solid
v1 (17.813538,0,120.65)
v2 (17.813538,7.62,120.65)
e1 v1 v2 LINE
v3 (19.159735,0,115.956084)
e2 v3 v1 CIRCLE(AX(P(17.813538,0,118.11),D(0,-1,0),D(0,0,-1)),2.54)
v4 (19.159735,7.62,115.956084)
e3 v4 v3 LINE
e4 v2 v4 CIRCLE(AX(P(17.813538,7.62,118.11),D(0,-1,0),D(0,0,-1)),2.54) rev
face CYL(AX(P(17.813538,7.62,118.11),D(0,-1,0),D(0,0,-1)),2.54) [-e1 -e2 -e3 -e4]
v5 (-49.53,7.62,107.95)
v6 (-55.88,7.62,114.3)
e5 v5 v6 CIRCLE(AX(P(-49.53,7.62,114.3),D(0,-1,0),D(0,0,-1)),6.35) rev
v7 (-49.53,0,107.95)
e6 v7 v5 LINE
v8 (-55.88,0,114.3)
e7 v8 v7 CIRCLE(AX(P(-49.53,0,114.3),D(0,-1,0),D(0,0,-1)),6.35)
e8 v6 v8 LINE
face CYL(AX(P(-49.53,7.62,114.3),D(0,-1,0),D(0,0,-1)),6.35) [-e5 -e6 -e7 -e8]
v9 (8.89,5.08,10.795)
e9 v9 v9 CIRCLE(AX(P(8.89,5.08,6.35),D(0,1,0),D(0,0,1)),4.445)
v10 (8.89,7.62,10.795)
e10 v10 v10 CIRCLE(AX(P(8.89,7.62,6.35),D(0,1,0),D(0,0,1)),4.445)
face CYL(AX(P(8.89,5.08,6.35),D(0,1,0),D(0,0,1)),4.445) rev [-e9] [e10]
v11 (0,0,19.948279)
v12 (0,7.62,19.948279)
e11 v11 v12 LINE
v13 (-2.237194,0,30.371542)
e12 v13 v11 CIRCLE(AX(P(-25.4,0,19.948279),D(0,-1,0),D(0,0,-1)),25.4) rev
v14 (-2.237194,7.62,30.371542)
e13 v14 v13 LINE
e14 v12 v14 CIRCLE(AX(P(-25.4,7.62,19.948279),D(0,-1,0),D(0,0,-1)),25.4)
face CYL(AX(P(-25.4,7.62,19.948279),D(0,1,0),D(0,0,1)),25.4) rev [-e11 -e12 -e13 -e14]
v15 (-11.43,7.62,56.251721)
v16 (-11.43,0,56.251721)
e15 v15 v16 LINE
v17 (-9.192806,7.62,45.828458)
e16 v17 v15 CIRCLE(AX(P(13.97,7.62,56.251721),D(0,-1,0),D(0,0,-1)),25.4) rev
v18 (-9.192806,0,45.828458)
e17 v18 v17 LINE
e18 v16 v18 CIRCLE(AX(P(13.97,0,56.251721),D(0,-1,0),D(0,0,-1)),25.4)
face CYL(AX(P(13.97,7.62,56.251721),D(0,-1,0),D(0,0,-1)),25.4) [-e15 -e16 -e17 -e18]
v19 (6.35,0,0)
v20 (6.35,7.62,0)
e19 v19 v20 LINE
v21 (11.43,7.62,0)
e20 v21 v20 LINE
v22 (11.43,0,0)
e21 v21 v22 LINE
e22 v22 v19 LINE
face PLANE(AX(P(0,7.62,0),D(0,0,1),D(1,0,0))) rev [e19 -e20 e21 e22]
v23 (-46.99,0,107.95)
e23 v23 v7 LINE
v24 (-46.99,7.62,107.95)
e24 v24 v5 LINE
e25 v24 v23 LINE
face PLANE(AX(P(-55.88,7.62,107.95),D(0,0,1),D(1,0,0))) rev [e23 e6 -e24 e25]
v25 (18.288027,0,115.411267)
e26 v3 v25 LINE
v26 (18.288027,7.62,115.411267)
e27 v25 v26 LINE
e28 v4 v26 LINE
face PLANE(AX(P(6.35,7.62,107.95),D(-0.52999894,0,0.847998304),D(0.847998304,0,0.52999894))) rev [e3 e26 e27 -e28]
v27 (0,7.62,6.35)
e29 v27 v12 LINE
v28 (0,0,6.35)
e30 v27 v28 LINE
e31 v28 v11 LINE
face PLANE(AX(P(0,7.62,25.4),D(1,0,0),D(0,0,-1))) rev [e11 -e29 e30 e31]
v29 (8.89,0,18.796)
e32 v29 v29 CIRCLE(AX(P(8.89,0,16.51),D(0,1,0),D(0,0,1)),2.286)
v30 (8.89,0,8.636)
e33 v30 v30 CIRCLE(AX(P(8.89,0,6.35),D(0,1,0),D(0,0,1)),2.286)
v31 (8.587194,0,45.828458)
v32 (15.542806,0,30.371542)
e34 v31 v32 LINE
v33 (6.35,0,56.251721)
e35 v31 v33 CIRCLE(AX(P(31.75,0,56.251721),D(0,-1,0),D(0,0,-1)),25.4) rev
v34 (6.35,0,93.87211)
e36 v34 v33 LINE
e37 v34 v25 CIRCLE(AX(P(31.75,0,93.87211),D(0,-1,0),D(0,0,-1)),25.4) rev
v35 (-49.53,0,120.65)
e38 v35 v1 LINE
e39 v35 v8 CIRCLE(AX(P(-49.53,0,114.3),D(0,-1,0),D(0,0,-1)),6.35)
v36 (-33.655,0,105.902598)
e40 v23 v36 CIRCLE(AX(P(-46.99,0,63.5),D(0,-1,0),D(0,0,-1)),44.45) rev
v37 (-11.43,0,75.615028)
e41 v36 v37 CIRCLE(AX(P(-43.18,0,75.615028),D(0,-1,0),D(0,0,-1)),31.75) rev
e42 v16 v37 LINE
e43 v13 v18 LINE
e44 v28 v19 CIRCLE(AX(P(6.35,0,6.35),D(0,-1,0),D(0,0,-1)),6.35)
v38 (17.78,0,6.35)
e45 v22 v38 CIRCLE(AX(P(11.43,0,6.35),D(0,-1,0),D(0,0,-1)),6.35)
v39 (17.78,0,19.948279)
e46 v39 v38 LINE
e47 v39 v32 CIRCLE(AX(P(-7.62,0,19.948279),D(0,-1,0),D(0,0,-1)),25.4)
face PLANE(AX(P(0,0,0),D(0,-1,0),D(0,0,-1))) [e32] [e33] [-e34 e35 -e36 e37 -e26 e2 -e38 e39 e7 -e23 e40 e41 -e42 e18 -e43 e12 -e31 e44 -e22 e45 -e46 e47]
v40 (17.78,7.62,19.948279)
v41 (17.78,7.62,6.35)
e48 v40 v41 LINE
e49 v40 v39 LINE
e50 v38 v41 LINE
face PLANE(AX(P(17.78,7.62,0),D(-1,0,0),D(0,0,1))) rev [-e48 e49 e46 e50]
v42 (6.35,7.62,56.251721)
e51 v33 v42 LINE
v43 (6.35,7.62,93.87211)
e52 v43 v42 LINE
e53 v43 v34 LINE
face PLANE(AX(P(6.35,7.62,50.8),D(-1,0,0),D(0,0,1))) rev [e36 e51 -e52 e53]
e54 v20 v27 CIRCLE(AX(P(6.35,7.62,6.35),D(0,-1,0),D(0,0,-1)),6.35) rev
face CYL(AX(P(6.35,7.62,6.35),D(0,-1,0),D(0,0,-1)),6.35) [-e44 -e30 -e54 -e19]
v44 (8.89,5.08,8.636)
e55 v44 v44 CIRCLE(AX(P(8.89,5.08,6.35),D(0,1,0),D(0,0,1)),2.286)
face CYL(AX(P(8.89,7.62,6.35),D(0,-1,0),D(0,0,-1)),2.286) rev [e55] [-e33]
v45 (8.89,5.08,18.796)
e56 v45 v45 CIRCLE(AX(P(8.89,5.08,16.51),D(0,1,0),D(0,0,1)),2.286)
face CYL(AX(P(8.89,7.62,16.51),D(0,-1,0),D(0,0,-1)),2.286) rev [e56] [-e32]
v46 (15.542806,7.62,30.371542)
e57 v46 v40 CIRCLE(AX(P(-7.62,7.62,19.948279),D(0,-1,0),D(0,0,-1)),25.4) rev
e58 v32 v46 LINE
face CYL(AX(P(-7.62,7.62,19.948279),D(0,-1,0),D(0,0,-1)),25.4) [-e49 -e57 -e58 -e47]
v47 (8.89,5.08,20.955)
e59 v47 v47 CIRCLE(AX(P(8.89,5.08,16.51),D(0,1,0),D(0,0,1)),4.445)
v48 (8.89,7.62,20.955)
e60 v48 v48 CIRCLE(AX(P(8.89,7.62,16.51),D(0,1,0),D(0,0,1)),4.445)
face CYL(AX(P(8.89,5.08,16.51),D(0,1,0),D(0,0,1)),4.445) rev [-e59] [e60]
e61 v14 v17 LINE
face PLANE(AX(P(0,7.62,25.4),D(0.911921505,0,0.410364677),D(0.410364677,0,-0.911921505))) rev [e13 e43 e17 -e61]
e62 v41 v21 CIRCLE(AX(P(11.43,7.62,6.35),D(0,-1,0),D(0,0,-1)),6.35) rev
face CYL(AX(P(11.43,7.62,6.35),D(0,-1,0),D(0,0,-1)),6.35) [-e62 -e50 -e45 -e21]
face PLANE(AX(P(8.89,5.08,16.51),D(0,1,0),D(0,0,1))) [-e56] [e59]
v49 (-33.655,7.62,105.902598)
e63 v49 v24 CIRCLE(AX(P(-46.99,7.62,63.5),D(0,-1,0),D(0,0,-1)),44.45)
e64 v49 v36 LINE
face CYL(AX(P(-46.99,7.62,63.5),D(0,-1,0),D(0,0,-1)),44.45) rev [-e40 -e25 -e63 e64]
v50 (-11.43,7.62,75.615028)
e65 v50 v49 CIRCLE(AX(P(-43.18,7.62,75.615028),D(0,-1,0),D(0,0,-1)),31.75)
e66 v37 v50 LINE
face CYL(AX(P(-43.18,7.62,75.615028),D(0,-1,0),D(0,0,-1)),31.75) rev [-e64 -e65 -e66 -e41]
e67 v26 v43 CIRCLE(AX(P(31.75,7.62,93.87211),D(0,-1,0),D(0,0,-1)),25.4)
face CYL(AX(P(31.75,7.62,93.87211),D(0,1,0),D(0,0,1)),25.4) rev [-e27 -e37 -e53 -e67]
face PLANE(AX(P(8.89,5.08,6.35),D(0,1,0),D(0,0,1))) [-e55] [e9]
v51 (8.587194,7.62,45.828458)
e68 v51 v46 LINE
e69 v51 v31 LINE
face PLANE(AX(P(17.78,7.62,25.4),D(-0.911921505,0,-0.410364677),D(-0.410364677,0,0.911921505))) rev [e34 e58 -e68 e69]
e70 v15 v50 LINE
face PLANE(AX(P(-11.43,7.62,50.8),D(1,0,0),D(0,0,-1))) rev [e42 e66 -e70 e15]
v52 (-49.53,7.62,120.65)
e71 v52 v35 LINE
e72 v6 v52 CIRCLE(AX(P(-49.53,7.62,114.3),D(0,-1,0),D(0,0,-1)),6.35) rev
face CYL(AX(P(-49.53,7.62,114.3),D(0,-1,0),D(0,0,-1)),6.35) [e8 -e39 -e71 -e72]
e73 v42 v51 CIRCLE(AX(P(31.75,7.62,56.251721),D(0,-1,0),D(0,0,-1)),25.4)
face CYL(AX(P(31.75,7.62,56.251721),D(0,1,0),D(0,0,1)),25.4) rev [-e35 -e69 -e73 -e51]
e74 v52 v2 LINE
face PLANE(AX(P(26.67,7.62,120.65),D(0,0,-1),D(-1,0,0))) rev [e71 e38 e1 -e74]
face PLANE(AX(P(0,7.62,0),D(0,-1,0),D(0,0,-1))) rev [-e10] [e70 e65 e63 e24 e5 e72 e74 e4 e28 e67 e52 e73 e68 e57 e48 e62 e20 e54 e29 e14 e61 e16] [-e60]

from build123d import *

# Parameters (mm, degrees)
SKETCH1_R           = 2.286
BOSS_EXTRUDE1_DEPTH = 7.62
FILLET1_R           = 25.4
FILLET3_R           = 44.45
FILLET2_R           = 6.35
FILLET4_R           = 31.75
SKETCH3_R           = 4.445
CUT_EXTRUDE1_DEPTH  = 2.54
FILLET5_R           = 2.54


# Some blends are built 0.0001 mm under size
with BuildPart() as part:
    # Sketch1 → Boss-Extrude1 (new body)
    with BuildSketch(Plane(origin=(0, 0, 0), x_dir=(1, 0, 0), z_dir=(0, 1, 0))):
        Polygon((0, 0), (17.78, 0), (17.78, -25.4), (6.35, -50.8), (6.35, -107.95), (26.67, -120.65), (-55.88, -120.65), (-55.88, -107.95), (-5.08, -107.95), (-11.43, -90.17), (-11.43, -50.8), (0, -25.4), align=None)
        with Locations(Location((8.89, -6.35, 0), (0, 0, 270))):
            Circle(SKETCH1_R, mode=Mode.SUBTRACT)
        with Locations(Location((8.89, -16.51, 0), (0, 0, 270))):
            Circle(SKETCH1_R, mode=Mode.SUBTRACT)
    extrude(amount=BOSS_EXTRUDE1_DEPTH)

    # Fillet1
    fillet1_edges = [part.edges().sort_by_distance(p)[0] for p in [
        (17.78, 3.81, 25.4),
        (6.35, 3.81, 50.8),
        (6.35, 3.81, 107.95),
        (-11.43, 3.81, 50.8),
        (0, 3.81, 25.4),
    ]]
    fillet(fillet1_edges, radius=FILLET1_R)

    # Fillet3
    # the kernel refuses this fillet: 44.45 mm, written as the material it adds along each edge
    with BuildSketch(Plane(origin=(-5.08, 0, 107.95), x_dir=(-0.3363363969981565, 0, -0.9417419115948374), z_dir=(0, 1, 0))) as fillet3_piece_1:
        with BuildLine():
            CenterArc((55.956286369, 24.518250668), FILLET3_R, 160.346175942, 53.130102354)
            Line((14.095858398, 39.468403515), (13.258649839, 39.767406572))
            Line((13.258649839, 39.767406572), (-0.837208559, 0.299003057))
            Line((-0.837208559, 0.299003057), (0, -0.889))
            ThreePointArc((0, -0.889), (9.439953655, -0.889), (18.138379728, -0.490365013))
            Line((18.138379728, -0.490365013), (18.879907309, 0))
        make_face()
    extrude(amount=7.62)

    # Fillet2
    fillet2_edges = [part.edges().sort_by_distance(p)[0] for p in [
        (17.78, 3.81, 0),
        (0, 3.81, 0),
        (-55.88, 3.81, 120.65),
        (-55.88, 3.81, 107.95),
    ]]
    fillet(fillet2_edges, radius=FILLET2_R - 0.0001)  # a hair under: the kernel refuses the full size

    # Fillet4
    fillet4_edges = [part.edges().sort_by_distance(p)[0] for p in [
        (-11.43, 3.81, 90.17),
    ]]
    fillet(fillet4_edges, radius=FILLET4_R)

    # Sketch3 → Cut-Extrude1 (cut)
    with BuildSketch(Plane(origin=(0, 7.62, 0), x_dir=(1, 0, 0), z_dir=(0, 1, 0))):
        with Locations(Location((8.89, -6.35, 0), (0, 0, 270))):
            Circle(SKETCH3_R)
        with Locations(Location((8.89, -16.51, 0), (0, 0, 270))):
            Circle(SKETCH3_R)
    extrude(amount=-CUT_EXTRUDE1_DEPTH, mode=Mode.SUBTRACT)

    # Fillet5
    fillet5_edges = [part.edges().sort_by_distance(p)[0] for p in [
        (26.67, 3.81, 120.65),
    ]]
    fillet(fillet5_edges, radius=FILLET5_R)


solid = part.part
